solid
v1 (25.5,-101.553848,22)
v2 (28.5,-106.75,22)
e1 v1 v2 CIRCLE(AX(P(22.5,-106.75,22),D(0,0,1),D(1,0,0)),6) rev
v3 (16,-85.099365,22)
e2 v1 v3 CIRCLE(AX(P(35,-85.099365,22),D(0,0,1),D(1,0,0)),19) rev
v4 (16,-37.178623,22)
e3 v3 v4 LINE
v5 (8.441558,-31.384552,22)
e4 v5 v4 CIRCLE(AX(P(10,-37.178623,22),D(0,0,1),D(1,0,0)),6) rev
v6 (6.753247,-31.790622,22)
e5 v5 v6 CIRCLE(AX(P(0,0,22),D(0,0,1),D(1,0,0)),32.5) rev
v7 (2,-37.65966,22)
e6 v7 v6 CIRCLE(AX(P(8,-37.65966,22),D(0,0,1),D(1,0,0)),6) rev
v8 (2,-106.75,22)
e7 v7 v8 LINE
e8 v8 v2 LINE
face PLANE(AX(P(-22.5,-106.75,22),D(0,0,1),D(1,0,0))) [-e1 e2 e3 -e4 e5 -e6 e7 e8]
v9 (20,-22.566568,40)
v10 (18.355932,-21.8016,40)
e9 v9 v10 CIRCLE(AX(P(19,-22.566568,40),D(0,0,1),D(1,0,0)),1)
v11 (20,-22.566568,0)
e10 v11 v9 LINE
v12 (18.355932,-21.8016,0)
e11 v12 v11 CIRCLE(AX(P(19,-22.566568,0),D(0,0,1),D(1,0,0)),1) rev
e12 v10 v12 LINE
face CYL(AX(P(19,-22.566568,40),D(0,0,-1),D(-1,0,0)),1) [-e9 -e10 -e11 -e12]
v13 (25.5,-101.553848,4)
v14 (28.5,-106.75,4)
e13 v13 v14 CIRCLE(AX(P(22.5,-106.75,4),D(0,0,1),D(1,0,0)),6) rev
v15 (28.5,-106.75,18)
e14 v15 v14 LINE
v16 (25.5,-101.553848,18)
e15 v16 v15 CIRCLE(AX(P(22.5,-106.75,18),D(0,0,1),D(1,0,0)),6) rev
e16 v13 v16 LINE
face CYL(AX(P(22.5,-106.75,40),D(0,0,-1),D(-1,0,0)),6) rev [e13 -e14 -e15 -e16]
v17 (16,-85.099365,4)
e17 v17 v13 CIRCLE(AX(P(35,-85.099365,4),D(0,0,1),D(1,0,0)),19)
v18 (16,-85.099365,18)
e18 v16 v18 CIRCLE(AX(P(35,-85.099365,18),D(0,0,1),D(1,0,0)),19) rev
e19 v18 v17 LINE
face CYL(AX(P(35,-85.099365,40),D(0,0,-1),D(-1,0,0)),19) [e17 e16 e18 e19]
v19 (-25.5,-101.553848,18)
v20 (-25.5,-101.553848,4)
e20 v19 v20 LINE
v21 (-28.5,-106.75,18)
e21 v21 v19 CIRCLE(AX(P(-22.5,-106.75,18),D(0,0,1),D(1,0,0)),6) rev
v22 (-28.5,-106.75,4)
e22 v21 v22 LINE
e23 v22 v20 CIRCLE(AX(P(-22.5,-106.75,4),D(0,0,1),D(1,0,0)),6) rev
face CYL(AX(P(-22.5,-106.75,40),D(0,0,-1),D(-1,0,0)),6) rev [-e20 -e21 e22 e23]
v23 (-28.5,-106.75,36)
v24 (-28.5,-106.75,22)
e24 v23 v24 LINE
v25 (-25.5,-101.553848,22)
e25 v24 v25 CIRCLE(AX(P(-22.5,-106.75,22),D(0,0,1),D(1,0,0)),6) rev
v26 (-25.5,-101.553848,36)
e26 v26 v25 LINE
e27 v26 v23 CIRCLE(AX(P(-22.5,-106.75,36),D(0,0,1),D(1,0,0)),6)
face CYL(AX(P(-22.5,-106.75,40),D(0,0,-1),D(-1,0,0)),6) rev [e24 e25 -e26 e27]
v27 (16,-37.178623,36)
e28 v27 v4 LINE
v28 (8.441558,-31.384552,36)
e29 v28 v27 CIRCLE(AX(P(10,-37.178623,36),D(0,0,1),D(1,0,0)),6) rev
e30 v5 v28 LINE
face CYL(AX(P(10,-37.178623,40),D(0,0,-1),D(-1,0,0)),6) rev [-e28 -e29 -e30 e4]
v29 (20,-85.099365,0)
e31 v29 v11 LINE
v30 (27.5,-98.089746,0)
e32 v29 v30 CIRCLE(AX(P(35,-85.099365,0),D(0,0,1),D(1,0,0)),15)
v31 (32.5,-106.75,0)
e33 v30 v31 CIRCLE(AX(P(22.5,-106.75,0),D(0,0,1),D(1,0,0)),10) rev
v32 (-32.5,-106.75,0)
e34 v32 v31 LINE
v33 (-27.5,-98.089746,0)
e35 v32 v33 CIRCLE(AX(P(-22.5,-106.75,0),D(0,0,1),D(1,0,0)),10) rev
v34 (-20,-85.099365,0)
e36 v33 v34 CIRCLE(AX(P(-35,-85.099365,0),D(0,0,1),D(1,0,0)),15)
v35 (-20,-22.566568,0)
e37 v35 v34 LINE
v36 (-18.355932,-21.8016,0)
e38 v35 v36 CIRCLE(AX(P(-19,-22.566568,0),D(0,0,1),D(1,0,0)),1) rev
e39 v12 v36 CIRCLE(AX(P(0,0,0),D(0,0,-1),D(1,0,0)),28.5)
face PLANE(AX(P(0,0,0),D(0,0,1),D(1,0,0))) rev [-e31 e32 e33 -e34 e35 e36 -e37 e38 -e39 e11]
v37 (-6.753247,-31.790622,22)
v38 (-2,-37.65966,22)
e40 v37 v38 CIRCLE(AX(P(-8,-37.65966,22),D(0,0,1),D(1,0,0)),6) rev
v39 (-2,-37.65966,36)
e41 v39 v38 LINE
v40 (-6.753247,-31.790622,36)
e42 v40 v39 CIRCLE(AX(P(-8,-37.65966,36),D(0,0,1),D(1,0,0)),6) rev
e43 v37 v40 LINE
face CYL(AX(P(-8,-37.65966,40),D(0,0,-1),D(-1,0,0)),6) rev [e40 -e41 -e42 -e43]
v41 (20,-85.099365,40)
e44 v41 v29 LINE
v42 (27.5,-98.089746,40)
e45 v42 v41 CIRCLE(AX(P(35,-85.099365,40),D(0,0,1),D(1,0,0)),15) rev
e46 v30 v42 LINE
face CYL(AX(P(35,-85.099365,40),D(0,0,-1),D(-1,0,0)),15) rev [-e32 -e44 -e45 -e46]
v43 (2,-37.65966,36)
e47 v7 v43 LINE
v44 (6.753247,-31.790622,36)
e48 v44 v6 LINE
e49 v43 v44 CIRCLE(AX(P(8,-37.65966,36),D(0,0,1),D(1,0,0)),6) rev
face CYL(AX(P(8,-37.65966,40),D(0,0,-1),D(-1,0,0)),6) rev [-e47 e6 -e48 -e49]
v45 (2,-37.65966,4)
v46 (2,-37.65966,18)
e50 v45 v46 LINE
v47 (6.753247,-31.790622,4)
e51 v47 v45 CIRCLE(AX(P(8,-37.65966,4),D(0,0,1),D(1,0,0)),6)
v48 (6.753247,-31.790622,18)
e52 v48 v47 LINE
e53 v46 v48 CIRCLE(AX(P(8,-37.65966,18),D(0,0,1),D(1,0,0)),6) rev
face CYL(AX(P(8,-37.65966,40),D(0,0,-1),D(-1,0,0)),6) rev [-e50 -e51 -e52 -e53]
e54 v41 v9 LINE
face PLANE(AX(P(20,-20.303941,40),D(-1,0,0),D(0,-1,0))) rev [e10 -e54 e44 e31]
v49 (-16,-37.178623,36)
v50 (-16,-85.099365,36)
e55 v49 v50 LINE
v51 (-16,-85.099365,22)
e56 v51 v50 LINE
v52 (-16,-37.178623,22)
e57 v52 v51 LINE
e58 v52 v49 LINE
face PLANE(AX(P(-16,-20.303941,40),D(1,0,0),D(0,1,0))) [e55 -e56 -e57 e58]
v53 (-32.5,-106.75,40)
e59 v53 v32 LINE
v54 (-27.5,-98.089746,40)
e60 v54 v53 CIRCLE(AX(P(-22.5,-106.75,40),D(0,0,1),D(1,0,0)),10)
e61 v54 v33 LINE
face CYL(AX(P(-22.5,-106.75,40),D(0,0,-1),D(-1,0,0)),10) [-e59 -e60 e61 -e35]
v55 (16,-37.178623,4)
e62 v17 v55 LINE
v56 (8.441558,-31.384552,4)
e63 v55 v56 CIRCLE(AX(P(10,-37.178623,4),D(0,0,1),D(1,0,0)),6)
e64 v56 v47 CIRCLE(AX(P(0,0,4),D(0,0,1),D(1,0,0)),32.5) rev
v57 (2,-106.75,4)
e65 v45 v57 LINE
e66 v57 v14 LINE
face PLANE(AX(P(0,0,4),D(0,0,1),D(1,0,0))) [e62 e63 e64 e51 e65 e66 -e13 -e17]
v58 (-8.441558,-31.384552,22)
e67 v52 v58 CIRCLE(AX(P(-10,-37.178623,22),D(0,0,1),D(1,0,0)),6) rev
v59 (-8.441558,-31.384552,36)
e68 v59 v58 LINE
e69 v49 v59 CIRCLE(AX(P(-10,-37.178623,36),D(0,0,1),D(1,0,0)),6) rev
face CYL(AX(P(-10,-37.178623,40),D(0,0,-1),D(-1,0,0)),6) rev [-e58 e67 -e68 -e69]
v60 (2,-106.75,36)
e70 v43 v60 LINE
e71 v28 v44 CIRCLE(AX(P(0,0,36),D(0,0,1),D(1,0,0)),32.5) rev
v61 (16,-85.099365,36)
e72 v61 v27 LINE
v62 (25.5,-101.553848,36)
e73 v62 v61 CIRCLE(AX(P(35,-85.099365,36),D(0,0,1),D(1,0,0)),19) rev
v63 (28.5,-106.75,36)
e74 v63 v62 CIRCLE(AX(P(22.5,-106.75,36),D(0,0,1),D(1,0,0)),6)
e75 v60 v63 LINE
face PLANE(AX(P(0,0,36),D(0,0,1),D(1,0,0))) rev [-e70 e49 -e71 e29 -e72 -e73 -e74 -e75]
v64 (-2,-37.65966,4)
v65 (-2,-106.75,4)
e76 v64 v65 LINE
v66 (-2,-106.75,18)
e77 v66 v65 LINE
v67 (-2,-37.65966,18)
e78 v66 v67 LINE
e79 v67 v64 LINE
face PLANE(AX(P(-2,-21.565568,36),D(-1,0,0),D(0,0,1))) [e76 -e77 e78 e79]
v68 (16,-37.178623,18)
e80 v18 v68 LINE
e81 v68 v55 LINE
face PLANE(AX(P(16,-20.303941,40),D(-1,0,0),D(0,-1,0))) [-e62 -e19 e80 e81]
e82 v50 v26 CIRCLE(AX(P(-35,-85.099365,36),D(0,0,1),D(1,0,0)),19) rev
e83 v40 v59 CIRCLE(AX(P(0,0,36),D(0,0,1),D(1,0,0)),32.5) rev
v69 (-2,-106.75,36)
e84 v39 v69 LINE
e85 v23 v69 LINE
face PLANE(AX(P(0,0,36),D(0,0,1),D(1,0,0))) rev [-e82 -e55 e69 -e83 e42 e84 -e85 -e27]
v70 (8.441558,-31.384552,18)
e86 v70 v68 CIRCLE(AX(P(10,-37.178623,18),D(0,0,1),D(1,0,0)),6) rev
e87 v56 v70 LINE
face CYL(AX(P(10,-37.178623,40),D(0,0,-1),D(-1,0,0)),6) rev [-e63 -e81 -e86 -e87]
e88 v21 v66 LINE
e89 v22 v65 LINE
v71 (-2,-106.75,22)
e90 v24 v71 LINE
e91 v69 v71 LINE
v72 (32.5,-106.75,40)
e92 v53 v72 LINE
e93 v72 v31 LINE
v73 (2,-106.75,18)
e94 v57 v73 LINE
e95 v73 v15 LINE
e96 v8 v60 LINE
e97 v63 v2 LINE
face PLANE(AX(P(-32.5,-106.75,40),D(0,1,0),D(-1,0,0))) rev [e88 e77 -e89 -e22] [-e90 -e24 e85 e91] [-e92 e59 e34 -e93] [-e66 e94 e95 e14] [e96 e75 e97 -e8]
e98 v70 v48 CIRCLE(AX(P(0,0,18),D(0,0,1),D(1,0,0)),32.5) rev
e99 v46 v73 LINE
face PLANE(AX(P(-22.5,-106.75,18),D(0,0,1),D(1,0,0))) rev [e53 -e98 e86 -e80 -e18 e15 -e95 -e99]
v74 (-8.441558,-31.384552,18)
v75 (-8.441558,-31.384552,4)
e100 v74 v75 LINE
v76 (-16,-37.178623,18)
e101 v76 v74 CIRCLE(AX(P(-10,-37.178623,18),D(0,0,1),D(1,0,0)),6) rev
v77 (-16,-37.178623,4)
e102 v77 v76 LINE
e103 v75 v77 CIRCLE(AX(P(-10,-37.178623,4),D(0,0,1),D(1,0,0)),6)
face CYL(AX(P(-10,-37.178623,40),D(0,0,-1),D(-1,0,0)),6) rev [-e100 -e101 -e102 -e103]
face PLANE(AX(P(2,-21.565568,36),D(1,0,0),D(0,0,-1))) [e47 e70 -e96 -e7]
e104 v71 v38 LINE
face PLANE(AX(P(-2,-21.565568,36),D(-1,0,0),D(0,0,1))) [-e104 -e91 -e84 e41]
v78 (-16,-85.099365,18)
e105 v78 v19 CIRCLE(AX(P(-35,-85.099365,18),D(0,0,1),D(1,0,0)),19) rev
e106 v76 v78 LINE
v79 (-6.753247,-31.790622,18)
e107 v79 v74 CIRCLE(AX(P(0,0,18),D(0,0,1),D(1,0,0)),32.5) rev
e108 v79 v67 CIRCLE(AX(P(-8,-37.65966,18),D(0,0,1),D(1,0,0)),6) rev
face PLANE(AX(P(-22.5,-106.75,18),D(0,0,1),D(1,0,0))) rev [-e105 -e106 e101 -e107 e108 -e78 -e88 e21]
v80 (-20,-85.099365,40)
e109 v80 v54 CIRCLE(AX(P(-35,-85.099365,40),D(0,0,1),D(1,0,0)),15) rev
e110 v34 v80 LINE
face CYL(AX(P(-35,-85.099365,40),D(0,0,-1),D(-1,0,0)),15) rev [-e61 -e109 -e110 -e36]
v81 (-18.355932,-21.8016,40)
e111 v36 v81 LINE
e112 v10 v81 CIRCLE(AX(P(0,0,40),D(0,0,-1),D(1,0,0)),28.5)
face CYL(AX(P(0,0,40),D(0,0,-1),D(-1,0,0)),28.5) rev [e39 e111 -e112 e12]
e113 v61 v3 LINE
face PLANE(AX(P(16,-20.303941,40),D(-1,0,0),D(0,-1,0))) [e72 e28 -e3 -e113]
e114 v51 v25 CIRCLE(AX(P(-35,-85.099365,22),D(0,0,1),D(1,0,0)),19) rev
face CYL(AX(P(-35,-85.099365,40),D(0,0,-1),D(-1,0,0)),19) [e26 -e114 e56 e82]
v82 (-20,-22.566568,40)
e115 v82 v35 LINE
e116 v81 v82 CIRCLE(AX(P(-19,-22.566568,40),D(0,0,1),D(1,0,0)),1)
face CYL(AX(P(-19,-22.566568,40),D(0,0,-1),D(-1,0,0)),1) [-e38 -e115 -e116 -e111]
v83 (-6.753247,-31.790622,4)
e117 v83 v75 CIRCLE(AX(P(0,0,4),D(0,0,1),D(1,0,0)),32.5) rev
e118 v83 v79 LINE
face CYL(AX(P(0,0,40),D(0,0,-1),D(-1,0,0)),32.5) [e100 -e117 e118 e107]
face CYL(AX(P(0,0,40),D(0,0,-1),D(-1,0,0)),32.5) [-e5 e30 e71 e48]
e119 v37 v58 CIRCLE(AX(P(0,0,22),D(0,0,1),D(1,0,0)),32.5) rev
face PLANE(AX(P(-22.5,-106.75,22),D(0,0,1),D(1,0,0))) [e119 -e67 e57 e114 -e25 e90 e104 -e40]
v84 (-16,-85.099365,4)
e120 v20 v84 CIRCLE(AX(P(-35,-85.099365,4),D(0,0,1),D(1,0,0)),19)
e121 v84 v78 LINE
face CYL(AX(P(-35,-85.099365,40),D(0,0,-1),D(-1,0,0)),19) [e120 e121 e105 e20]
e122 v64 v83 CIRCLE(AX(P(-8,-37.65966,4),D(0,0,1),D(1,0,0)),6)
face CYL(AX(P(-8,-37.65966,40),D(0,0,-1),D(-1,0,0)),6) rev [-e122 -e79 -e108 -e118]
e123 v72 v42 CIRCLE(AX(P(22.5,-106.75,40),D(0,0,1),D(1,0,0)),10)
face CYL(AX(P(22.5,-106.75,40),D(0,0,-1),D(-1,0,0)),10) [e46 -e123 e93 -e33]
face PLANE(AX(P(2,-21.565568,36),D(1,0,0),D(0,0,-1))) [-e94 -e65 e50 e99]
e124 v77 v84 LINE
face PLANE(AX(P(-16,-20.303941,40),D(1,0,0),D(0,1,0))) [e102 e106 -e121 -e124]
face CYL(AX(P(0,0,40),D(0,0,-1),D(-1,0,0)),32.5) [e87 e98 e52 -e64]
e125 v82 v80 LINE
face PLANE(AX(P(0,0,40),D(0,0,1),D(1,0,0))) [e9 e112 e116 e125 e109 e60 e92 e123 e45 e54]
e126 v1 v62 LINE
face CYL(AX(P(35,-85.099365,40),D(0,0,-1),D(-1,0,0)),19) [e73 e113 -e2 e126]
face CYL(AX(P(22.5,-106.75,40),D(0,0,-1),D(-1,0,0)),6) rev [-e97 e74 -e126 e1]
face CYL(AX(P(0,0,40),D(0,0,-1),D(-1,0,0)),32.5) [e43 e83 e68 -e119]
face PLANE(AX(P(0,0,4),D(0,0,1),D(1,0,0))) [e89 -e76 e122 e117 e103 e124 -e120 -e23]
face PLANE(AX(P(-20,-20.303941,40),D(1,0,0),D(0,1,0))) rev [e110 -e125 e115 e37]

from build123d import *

# Parameters (mm, degrees)
EXTRUDE_1_DEPTH      = 40
FILLET_1_R           = 1
FILLET_2_R           = 10
FILLET_3_R           = 15
SHELL_1_T            = -4
EXTRUDE_2_REACH      = 101.561
EXTRUDE_2_END_RADIUS = 32.5
SKETCH_3_W           = 4
SKETCH_3_H           = 32
FILLET_4_R           = 6
EXTRUDE_3_DEPTH      = 2
EXTRUDE_3_DEPTH_BACK = 2
EXTRUDE_3_START      = -20


with BuildPart() as part:
    # 草图1 → 凸台-拉伸1 (new body)
    with BuildSketch(Plane.XY):
        with BuildLine():
            Line((-32.5, -106.75), (32.5, -106.75))
            Line((32.5, -106.75), (32.5, -96.75))
            Line((32.5, -96.75), (20, -96.75))
            Line((20, -96.75), (20, -20.303940504))
            ThreePointArc((20, -20.303940504), (0, -28.5), (-20, -20.303940504))
            Line((-20, -20.303940504), (-20, -96.75))
            Line((-20, -96.75), (-32.5, -96.75))
            Line((-32.5, -96.75), (-32.5, -106.75))
        make_face()
    extrude(amount=EXTRUDE_1_DEPTH)

    # 圆角1
    fillet_1_edges = [part.edges().sort_by_distance(p)[0] for p in [
        (-20, -20.303940504, 20),
        (20, -20.303940504, 20),
    ]]
    fillet(fillet_1_edges, radius=FILLET_1_R)

    # 圆角2
    fillet_2_edges = [part.edges().sort_by_distance(p)[0] for p in [
        (32.5, -96.75, 20),
        (-32.5, -96.75, 20),
    ]]
    fillet(fillet_2_edges, radius=FILLET_2_R - 0.0001)  # a hair under: the kernel refuses the full size

    # 圆角3
    fillet_3_edges = [part.edges().sort_by_distance(p)[0] for p in [
        (20, -96.75, 20),
        (-20, -96.75, 20),
    ]]
    fillet(fillet_3_edges, radius=FILLET_3_R)

    # 抽壳1
    shell_1_openings = [part.faces().sort_by_distance(p)[0] for p in [
        (0, -106.75, 20),
    ]]
    offset(amount=SHELL_1_T, openings=shell_1_openings)

    # 凸台-拉伸2: up to this cylinder (the profile starts outside it)
    extrude_2_end = Plane(origin=(0, 0, 20), z_dir=(0, 0, -1)) * Cylinder(EXTRUDE_2_END_RADIUS, 269.122, mode=Mode.PRIVATE)
    # 草图3 → 凸台-拉伸2 (add, up to the surface)
    with BuildSketch(Plane.XZ.offset(106.75), mode=Mode.PRIVATE) as extrude_2_sk1:
        with Locations((0, 20)):
            Rectangle(SKETCH_3_W, SKETCH_3_H)
    extrude_2_tool1 = extrude(extrude_2_sk1.sketch, amount=-EXTRUDE_2_REACH, mode=Mode.PRIVATE) - extrude_2_end
    add(extrude_2_tool1.solids().sort_by_distance((0, -106.75, 20))[0])

    # 圆角4
    fillet_4_edges = [part.edges().sort_by_distance(p)[0] for p in [
        (16, -28.28869032, 20),
        (-16, -28.28869032, 20),
        (-2, -32.438403167, 20),
        (2, -32.438403167, 20),
    ]]
    fillet(fillet_4_edges, radius=FILLET_4_R)

    # 草图5 → 凸台-拉伸3 (add, two sides: drawn at the far end of the back side and taken through both)
    with BuildSketch(Plane.XY.offset(40).offset(EXTRUDE_3_START - EXTRUDE_3_DEPTH_BACK)):
        with BuildLine():
            Line((-32.5, -106.75), (32.5, -106.75))
            ThreePointArc((32.5, -106.75), (31.160254038, -101.75), (27.5, -98.089745962))
            ThreePointArc((27.5, -98.089745962), (22.009618943, -92.599364905), (20, -85.099364905))
            Line((20, -85.099364905), (20, -22.566568193))
            ThreePointArc((20, -22.566568193), (19.421860287, -21.659907342), (18.355932203, -21.801599779))
            ThreePointArc((18.355932203, -21.801599779), (0, -28.5), (-18.355932203, -21.801599779))
            ThreePointArc((-18.355932203, -21.801599779), (-19.421860287, -21.659907342), (-20, -22.566568193))
            Line((-20, -22.566568193), (-20, -85.099364905))
            ThreePointArc((-20, -85.099364905), (-22.009618943, -92.599364905), (-27.5, -98.089745962))
            ThreePointArc((-27.5, -98.089745962), (-31.160254038, -101.75), (-32.5, -106.75))
        make_face()
    extrude(amount=EXTRUDE_3_DEPTH + EXTRUDE_3_DEPTH_BACK)


solid = part.part
